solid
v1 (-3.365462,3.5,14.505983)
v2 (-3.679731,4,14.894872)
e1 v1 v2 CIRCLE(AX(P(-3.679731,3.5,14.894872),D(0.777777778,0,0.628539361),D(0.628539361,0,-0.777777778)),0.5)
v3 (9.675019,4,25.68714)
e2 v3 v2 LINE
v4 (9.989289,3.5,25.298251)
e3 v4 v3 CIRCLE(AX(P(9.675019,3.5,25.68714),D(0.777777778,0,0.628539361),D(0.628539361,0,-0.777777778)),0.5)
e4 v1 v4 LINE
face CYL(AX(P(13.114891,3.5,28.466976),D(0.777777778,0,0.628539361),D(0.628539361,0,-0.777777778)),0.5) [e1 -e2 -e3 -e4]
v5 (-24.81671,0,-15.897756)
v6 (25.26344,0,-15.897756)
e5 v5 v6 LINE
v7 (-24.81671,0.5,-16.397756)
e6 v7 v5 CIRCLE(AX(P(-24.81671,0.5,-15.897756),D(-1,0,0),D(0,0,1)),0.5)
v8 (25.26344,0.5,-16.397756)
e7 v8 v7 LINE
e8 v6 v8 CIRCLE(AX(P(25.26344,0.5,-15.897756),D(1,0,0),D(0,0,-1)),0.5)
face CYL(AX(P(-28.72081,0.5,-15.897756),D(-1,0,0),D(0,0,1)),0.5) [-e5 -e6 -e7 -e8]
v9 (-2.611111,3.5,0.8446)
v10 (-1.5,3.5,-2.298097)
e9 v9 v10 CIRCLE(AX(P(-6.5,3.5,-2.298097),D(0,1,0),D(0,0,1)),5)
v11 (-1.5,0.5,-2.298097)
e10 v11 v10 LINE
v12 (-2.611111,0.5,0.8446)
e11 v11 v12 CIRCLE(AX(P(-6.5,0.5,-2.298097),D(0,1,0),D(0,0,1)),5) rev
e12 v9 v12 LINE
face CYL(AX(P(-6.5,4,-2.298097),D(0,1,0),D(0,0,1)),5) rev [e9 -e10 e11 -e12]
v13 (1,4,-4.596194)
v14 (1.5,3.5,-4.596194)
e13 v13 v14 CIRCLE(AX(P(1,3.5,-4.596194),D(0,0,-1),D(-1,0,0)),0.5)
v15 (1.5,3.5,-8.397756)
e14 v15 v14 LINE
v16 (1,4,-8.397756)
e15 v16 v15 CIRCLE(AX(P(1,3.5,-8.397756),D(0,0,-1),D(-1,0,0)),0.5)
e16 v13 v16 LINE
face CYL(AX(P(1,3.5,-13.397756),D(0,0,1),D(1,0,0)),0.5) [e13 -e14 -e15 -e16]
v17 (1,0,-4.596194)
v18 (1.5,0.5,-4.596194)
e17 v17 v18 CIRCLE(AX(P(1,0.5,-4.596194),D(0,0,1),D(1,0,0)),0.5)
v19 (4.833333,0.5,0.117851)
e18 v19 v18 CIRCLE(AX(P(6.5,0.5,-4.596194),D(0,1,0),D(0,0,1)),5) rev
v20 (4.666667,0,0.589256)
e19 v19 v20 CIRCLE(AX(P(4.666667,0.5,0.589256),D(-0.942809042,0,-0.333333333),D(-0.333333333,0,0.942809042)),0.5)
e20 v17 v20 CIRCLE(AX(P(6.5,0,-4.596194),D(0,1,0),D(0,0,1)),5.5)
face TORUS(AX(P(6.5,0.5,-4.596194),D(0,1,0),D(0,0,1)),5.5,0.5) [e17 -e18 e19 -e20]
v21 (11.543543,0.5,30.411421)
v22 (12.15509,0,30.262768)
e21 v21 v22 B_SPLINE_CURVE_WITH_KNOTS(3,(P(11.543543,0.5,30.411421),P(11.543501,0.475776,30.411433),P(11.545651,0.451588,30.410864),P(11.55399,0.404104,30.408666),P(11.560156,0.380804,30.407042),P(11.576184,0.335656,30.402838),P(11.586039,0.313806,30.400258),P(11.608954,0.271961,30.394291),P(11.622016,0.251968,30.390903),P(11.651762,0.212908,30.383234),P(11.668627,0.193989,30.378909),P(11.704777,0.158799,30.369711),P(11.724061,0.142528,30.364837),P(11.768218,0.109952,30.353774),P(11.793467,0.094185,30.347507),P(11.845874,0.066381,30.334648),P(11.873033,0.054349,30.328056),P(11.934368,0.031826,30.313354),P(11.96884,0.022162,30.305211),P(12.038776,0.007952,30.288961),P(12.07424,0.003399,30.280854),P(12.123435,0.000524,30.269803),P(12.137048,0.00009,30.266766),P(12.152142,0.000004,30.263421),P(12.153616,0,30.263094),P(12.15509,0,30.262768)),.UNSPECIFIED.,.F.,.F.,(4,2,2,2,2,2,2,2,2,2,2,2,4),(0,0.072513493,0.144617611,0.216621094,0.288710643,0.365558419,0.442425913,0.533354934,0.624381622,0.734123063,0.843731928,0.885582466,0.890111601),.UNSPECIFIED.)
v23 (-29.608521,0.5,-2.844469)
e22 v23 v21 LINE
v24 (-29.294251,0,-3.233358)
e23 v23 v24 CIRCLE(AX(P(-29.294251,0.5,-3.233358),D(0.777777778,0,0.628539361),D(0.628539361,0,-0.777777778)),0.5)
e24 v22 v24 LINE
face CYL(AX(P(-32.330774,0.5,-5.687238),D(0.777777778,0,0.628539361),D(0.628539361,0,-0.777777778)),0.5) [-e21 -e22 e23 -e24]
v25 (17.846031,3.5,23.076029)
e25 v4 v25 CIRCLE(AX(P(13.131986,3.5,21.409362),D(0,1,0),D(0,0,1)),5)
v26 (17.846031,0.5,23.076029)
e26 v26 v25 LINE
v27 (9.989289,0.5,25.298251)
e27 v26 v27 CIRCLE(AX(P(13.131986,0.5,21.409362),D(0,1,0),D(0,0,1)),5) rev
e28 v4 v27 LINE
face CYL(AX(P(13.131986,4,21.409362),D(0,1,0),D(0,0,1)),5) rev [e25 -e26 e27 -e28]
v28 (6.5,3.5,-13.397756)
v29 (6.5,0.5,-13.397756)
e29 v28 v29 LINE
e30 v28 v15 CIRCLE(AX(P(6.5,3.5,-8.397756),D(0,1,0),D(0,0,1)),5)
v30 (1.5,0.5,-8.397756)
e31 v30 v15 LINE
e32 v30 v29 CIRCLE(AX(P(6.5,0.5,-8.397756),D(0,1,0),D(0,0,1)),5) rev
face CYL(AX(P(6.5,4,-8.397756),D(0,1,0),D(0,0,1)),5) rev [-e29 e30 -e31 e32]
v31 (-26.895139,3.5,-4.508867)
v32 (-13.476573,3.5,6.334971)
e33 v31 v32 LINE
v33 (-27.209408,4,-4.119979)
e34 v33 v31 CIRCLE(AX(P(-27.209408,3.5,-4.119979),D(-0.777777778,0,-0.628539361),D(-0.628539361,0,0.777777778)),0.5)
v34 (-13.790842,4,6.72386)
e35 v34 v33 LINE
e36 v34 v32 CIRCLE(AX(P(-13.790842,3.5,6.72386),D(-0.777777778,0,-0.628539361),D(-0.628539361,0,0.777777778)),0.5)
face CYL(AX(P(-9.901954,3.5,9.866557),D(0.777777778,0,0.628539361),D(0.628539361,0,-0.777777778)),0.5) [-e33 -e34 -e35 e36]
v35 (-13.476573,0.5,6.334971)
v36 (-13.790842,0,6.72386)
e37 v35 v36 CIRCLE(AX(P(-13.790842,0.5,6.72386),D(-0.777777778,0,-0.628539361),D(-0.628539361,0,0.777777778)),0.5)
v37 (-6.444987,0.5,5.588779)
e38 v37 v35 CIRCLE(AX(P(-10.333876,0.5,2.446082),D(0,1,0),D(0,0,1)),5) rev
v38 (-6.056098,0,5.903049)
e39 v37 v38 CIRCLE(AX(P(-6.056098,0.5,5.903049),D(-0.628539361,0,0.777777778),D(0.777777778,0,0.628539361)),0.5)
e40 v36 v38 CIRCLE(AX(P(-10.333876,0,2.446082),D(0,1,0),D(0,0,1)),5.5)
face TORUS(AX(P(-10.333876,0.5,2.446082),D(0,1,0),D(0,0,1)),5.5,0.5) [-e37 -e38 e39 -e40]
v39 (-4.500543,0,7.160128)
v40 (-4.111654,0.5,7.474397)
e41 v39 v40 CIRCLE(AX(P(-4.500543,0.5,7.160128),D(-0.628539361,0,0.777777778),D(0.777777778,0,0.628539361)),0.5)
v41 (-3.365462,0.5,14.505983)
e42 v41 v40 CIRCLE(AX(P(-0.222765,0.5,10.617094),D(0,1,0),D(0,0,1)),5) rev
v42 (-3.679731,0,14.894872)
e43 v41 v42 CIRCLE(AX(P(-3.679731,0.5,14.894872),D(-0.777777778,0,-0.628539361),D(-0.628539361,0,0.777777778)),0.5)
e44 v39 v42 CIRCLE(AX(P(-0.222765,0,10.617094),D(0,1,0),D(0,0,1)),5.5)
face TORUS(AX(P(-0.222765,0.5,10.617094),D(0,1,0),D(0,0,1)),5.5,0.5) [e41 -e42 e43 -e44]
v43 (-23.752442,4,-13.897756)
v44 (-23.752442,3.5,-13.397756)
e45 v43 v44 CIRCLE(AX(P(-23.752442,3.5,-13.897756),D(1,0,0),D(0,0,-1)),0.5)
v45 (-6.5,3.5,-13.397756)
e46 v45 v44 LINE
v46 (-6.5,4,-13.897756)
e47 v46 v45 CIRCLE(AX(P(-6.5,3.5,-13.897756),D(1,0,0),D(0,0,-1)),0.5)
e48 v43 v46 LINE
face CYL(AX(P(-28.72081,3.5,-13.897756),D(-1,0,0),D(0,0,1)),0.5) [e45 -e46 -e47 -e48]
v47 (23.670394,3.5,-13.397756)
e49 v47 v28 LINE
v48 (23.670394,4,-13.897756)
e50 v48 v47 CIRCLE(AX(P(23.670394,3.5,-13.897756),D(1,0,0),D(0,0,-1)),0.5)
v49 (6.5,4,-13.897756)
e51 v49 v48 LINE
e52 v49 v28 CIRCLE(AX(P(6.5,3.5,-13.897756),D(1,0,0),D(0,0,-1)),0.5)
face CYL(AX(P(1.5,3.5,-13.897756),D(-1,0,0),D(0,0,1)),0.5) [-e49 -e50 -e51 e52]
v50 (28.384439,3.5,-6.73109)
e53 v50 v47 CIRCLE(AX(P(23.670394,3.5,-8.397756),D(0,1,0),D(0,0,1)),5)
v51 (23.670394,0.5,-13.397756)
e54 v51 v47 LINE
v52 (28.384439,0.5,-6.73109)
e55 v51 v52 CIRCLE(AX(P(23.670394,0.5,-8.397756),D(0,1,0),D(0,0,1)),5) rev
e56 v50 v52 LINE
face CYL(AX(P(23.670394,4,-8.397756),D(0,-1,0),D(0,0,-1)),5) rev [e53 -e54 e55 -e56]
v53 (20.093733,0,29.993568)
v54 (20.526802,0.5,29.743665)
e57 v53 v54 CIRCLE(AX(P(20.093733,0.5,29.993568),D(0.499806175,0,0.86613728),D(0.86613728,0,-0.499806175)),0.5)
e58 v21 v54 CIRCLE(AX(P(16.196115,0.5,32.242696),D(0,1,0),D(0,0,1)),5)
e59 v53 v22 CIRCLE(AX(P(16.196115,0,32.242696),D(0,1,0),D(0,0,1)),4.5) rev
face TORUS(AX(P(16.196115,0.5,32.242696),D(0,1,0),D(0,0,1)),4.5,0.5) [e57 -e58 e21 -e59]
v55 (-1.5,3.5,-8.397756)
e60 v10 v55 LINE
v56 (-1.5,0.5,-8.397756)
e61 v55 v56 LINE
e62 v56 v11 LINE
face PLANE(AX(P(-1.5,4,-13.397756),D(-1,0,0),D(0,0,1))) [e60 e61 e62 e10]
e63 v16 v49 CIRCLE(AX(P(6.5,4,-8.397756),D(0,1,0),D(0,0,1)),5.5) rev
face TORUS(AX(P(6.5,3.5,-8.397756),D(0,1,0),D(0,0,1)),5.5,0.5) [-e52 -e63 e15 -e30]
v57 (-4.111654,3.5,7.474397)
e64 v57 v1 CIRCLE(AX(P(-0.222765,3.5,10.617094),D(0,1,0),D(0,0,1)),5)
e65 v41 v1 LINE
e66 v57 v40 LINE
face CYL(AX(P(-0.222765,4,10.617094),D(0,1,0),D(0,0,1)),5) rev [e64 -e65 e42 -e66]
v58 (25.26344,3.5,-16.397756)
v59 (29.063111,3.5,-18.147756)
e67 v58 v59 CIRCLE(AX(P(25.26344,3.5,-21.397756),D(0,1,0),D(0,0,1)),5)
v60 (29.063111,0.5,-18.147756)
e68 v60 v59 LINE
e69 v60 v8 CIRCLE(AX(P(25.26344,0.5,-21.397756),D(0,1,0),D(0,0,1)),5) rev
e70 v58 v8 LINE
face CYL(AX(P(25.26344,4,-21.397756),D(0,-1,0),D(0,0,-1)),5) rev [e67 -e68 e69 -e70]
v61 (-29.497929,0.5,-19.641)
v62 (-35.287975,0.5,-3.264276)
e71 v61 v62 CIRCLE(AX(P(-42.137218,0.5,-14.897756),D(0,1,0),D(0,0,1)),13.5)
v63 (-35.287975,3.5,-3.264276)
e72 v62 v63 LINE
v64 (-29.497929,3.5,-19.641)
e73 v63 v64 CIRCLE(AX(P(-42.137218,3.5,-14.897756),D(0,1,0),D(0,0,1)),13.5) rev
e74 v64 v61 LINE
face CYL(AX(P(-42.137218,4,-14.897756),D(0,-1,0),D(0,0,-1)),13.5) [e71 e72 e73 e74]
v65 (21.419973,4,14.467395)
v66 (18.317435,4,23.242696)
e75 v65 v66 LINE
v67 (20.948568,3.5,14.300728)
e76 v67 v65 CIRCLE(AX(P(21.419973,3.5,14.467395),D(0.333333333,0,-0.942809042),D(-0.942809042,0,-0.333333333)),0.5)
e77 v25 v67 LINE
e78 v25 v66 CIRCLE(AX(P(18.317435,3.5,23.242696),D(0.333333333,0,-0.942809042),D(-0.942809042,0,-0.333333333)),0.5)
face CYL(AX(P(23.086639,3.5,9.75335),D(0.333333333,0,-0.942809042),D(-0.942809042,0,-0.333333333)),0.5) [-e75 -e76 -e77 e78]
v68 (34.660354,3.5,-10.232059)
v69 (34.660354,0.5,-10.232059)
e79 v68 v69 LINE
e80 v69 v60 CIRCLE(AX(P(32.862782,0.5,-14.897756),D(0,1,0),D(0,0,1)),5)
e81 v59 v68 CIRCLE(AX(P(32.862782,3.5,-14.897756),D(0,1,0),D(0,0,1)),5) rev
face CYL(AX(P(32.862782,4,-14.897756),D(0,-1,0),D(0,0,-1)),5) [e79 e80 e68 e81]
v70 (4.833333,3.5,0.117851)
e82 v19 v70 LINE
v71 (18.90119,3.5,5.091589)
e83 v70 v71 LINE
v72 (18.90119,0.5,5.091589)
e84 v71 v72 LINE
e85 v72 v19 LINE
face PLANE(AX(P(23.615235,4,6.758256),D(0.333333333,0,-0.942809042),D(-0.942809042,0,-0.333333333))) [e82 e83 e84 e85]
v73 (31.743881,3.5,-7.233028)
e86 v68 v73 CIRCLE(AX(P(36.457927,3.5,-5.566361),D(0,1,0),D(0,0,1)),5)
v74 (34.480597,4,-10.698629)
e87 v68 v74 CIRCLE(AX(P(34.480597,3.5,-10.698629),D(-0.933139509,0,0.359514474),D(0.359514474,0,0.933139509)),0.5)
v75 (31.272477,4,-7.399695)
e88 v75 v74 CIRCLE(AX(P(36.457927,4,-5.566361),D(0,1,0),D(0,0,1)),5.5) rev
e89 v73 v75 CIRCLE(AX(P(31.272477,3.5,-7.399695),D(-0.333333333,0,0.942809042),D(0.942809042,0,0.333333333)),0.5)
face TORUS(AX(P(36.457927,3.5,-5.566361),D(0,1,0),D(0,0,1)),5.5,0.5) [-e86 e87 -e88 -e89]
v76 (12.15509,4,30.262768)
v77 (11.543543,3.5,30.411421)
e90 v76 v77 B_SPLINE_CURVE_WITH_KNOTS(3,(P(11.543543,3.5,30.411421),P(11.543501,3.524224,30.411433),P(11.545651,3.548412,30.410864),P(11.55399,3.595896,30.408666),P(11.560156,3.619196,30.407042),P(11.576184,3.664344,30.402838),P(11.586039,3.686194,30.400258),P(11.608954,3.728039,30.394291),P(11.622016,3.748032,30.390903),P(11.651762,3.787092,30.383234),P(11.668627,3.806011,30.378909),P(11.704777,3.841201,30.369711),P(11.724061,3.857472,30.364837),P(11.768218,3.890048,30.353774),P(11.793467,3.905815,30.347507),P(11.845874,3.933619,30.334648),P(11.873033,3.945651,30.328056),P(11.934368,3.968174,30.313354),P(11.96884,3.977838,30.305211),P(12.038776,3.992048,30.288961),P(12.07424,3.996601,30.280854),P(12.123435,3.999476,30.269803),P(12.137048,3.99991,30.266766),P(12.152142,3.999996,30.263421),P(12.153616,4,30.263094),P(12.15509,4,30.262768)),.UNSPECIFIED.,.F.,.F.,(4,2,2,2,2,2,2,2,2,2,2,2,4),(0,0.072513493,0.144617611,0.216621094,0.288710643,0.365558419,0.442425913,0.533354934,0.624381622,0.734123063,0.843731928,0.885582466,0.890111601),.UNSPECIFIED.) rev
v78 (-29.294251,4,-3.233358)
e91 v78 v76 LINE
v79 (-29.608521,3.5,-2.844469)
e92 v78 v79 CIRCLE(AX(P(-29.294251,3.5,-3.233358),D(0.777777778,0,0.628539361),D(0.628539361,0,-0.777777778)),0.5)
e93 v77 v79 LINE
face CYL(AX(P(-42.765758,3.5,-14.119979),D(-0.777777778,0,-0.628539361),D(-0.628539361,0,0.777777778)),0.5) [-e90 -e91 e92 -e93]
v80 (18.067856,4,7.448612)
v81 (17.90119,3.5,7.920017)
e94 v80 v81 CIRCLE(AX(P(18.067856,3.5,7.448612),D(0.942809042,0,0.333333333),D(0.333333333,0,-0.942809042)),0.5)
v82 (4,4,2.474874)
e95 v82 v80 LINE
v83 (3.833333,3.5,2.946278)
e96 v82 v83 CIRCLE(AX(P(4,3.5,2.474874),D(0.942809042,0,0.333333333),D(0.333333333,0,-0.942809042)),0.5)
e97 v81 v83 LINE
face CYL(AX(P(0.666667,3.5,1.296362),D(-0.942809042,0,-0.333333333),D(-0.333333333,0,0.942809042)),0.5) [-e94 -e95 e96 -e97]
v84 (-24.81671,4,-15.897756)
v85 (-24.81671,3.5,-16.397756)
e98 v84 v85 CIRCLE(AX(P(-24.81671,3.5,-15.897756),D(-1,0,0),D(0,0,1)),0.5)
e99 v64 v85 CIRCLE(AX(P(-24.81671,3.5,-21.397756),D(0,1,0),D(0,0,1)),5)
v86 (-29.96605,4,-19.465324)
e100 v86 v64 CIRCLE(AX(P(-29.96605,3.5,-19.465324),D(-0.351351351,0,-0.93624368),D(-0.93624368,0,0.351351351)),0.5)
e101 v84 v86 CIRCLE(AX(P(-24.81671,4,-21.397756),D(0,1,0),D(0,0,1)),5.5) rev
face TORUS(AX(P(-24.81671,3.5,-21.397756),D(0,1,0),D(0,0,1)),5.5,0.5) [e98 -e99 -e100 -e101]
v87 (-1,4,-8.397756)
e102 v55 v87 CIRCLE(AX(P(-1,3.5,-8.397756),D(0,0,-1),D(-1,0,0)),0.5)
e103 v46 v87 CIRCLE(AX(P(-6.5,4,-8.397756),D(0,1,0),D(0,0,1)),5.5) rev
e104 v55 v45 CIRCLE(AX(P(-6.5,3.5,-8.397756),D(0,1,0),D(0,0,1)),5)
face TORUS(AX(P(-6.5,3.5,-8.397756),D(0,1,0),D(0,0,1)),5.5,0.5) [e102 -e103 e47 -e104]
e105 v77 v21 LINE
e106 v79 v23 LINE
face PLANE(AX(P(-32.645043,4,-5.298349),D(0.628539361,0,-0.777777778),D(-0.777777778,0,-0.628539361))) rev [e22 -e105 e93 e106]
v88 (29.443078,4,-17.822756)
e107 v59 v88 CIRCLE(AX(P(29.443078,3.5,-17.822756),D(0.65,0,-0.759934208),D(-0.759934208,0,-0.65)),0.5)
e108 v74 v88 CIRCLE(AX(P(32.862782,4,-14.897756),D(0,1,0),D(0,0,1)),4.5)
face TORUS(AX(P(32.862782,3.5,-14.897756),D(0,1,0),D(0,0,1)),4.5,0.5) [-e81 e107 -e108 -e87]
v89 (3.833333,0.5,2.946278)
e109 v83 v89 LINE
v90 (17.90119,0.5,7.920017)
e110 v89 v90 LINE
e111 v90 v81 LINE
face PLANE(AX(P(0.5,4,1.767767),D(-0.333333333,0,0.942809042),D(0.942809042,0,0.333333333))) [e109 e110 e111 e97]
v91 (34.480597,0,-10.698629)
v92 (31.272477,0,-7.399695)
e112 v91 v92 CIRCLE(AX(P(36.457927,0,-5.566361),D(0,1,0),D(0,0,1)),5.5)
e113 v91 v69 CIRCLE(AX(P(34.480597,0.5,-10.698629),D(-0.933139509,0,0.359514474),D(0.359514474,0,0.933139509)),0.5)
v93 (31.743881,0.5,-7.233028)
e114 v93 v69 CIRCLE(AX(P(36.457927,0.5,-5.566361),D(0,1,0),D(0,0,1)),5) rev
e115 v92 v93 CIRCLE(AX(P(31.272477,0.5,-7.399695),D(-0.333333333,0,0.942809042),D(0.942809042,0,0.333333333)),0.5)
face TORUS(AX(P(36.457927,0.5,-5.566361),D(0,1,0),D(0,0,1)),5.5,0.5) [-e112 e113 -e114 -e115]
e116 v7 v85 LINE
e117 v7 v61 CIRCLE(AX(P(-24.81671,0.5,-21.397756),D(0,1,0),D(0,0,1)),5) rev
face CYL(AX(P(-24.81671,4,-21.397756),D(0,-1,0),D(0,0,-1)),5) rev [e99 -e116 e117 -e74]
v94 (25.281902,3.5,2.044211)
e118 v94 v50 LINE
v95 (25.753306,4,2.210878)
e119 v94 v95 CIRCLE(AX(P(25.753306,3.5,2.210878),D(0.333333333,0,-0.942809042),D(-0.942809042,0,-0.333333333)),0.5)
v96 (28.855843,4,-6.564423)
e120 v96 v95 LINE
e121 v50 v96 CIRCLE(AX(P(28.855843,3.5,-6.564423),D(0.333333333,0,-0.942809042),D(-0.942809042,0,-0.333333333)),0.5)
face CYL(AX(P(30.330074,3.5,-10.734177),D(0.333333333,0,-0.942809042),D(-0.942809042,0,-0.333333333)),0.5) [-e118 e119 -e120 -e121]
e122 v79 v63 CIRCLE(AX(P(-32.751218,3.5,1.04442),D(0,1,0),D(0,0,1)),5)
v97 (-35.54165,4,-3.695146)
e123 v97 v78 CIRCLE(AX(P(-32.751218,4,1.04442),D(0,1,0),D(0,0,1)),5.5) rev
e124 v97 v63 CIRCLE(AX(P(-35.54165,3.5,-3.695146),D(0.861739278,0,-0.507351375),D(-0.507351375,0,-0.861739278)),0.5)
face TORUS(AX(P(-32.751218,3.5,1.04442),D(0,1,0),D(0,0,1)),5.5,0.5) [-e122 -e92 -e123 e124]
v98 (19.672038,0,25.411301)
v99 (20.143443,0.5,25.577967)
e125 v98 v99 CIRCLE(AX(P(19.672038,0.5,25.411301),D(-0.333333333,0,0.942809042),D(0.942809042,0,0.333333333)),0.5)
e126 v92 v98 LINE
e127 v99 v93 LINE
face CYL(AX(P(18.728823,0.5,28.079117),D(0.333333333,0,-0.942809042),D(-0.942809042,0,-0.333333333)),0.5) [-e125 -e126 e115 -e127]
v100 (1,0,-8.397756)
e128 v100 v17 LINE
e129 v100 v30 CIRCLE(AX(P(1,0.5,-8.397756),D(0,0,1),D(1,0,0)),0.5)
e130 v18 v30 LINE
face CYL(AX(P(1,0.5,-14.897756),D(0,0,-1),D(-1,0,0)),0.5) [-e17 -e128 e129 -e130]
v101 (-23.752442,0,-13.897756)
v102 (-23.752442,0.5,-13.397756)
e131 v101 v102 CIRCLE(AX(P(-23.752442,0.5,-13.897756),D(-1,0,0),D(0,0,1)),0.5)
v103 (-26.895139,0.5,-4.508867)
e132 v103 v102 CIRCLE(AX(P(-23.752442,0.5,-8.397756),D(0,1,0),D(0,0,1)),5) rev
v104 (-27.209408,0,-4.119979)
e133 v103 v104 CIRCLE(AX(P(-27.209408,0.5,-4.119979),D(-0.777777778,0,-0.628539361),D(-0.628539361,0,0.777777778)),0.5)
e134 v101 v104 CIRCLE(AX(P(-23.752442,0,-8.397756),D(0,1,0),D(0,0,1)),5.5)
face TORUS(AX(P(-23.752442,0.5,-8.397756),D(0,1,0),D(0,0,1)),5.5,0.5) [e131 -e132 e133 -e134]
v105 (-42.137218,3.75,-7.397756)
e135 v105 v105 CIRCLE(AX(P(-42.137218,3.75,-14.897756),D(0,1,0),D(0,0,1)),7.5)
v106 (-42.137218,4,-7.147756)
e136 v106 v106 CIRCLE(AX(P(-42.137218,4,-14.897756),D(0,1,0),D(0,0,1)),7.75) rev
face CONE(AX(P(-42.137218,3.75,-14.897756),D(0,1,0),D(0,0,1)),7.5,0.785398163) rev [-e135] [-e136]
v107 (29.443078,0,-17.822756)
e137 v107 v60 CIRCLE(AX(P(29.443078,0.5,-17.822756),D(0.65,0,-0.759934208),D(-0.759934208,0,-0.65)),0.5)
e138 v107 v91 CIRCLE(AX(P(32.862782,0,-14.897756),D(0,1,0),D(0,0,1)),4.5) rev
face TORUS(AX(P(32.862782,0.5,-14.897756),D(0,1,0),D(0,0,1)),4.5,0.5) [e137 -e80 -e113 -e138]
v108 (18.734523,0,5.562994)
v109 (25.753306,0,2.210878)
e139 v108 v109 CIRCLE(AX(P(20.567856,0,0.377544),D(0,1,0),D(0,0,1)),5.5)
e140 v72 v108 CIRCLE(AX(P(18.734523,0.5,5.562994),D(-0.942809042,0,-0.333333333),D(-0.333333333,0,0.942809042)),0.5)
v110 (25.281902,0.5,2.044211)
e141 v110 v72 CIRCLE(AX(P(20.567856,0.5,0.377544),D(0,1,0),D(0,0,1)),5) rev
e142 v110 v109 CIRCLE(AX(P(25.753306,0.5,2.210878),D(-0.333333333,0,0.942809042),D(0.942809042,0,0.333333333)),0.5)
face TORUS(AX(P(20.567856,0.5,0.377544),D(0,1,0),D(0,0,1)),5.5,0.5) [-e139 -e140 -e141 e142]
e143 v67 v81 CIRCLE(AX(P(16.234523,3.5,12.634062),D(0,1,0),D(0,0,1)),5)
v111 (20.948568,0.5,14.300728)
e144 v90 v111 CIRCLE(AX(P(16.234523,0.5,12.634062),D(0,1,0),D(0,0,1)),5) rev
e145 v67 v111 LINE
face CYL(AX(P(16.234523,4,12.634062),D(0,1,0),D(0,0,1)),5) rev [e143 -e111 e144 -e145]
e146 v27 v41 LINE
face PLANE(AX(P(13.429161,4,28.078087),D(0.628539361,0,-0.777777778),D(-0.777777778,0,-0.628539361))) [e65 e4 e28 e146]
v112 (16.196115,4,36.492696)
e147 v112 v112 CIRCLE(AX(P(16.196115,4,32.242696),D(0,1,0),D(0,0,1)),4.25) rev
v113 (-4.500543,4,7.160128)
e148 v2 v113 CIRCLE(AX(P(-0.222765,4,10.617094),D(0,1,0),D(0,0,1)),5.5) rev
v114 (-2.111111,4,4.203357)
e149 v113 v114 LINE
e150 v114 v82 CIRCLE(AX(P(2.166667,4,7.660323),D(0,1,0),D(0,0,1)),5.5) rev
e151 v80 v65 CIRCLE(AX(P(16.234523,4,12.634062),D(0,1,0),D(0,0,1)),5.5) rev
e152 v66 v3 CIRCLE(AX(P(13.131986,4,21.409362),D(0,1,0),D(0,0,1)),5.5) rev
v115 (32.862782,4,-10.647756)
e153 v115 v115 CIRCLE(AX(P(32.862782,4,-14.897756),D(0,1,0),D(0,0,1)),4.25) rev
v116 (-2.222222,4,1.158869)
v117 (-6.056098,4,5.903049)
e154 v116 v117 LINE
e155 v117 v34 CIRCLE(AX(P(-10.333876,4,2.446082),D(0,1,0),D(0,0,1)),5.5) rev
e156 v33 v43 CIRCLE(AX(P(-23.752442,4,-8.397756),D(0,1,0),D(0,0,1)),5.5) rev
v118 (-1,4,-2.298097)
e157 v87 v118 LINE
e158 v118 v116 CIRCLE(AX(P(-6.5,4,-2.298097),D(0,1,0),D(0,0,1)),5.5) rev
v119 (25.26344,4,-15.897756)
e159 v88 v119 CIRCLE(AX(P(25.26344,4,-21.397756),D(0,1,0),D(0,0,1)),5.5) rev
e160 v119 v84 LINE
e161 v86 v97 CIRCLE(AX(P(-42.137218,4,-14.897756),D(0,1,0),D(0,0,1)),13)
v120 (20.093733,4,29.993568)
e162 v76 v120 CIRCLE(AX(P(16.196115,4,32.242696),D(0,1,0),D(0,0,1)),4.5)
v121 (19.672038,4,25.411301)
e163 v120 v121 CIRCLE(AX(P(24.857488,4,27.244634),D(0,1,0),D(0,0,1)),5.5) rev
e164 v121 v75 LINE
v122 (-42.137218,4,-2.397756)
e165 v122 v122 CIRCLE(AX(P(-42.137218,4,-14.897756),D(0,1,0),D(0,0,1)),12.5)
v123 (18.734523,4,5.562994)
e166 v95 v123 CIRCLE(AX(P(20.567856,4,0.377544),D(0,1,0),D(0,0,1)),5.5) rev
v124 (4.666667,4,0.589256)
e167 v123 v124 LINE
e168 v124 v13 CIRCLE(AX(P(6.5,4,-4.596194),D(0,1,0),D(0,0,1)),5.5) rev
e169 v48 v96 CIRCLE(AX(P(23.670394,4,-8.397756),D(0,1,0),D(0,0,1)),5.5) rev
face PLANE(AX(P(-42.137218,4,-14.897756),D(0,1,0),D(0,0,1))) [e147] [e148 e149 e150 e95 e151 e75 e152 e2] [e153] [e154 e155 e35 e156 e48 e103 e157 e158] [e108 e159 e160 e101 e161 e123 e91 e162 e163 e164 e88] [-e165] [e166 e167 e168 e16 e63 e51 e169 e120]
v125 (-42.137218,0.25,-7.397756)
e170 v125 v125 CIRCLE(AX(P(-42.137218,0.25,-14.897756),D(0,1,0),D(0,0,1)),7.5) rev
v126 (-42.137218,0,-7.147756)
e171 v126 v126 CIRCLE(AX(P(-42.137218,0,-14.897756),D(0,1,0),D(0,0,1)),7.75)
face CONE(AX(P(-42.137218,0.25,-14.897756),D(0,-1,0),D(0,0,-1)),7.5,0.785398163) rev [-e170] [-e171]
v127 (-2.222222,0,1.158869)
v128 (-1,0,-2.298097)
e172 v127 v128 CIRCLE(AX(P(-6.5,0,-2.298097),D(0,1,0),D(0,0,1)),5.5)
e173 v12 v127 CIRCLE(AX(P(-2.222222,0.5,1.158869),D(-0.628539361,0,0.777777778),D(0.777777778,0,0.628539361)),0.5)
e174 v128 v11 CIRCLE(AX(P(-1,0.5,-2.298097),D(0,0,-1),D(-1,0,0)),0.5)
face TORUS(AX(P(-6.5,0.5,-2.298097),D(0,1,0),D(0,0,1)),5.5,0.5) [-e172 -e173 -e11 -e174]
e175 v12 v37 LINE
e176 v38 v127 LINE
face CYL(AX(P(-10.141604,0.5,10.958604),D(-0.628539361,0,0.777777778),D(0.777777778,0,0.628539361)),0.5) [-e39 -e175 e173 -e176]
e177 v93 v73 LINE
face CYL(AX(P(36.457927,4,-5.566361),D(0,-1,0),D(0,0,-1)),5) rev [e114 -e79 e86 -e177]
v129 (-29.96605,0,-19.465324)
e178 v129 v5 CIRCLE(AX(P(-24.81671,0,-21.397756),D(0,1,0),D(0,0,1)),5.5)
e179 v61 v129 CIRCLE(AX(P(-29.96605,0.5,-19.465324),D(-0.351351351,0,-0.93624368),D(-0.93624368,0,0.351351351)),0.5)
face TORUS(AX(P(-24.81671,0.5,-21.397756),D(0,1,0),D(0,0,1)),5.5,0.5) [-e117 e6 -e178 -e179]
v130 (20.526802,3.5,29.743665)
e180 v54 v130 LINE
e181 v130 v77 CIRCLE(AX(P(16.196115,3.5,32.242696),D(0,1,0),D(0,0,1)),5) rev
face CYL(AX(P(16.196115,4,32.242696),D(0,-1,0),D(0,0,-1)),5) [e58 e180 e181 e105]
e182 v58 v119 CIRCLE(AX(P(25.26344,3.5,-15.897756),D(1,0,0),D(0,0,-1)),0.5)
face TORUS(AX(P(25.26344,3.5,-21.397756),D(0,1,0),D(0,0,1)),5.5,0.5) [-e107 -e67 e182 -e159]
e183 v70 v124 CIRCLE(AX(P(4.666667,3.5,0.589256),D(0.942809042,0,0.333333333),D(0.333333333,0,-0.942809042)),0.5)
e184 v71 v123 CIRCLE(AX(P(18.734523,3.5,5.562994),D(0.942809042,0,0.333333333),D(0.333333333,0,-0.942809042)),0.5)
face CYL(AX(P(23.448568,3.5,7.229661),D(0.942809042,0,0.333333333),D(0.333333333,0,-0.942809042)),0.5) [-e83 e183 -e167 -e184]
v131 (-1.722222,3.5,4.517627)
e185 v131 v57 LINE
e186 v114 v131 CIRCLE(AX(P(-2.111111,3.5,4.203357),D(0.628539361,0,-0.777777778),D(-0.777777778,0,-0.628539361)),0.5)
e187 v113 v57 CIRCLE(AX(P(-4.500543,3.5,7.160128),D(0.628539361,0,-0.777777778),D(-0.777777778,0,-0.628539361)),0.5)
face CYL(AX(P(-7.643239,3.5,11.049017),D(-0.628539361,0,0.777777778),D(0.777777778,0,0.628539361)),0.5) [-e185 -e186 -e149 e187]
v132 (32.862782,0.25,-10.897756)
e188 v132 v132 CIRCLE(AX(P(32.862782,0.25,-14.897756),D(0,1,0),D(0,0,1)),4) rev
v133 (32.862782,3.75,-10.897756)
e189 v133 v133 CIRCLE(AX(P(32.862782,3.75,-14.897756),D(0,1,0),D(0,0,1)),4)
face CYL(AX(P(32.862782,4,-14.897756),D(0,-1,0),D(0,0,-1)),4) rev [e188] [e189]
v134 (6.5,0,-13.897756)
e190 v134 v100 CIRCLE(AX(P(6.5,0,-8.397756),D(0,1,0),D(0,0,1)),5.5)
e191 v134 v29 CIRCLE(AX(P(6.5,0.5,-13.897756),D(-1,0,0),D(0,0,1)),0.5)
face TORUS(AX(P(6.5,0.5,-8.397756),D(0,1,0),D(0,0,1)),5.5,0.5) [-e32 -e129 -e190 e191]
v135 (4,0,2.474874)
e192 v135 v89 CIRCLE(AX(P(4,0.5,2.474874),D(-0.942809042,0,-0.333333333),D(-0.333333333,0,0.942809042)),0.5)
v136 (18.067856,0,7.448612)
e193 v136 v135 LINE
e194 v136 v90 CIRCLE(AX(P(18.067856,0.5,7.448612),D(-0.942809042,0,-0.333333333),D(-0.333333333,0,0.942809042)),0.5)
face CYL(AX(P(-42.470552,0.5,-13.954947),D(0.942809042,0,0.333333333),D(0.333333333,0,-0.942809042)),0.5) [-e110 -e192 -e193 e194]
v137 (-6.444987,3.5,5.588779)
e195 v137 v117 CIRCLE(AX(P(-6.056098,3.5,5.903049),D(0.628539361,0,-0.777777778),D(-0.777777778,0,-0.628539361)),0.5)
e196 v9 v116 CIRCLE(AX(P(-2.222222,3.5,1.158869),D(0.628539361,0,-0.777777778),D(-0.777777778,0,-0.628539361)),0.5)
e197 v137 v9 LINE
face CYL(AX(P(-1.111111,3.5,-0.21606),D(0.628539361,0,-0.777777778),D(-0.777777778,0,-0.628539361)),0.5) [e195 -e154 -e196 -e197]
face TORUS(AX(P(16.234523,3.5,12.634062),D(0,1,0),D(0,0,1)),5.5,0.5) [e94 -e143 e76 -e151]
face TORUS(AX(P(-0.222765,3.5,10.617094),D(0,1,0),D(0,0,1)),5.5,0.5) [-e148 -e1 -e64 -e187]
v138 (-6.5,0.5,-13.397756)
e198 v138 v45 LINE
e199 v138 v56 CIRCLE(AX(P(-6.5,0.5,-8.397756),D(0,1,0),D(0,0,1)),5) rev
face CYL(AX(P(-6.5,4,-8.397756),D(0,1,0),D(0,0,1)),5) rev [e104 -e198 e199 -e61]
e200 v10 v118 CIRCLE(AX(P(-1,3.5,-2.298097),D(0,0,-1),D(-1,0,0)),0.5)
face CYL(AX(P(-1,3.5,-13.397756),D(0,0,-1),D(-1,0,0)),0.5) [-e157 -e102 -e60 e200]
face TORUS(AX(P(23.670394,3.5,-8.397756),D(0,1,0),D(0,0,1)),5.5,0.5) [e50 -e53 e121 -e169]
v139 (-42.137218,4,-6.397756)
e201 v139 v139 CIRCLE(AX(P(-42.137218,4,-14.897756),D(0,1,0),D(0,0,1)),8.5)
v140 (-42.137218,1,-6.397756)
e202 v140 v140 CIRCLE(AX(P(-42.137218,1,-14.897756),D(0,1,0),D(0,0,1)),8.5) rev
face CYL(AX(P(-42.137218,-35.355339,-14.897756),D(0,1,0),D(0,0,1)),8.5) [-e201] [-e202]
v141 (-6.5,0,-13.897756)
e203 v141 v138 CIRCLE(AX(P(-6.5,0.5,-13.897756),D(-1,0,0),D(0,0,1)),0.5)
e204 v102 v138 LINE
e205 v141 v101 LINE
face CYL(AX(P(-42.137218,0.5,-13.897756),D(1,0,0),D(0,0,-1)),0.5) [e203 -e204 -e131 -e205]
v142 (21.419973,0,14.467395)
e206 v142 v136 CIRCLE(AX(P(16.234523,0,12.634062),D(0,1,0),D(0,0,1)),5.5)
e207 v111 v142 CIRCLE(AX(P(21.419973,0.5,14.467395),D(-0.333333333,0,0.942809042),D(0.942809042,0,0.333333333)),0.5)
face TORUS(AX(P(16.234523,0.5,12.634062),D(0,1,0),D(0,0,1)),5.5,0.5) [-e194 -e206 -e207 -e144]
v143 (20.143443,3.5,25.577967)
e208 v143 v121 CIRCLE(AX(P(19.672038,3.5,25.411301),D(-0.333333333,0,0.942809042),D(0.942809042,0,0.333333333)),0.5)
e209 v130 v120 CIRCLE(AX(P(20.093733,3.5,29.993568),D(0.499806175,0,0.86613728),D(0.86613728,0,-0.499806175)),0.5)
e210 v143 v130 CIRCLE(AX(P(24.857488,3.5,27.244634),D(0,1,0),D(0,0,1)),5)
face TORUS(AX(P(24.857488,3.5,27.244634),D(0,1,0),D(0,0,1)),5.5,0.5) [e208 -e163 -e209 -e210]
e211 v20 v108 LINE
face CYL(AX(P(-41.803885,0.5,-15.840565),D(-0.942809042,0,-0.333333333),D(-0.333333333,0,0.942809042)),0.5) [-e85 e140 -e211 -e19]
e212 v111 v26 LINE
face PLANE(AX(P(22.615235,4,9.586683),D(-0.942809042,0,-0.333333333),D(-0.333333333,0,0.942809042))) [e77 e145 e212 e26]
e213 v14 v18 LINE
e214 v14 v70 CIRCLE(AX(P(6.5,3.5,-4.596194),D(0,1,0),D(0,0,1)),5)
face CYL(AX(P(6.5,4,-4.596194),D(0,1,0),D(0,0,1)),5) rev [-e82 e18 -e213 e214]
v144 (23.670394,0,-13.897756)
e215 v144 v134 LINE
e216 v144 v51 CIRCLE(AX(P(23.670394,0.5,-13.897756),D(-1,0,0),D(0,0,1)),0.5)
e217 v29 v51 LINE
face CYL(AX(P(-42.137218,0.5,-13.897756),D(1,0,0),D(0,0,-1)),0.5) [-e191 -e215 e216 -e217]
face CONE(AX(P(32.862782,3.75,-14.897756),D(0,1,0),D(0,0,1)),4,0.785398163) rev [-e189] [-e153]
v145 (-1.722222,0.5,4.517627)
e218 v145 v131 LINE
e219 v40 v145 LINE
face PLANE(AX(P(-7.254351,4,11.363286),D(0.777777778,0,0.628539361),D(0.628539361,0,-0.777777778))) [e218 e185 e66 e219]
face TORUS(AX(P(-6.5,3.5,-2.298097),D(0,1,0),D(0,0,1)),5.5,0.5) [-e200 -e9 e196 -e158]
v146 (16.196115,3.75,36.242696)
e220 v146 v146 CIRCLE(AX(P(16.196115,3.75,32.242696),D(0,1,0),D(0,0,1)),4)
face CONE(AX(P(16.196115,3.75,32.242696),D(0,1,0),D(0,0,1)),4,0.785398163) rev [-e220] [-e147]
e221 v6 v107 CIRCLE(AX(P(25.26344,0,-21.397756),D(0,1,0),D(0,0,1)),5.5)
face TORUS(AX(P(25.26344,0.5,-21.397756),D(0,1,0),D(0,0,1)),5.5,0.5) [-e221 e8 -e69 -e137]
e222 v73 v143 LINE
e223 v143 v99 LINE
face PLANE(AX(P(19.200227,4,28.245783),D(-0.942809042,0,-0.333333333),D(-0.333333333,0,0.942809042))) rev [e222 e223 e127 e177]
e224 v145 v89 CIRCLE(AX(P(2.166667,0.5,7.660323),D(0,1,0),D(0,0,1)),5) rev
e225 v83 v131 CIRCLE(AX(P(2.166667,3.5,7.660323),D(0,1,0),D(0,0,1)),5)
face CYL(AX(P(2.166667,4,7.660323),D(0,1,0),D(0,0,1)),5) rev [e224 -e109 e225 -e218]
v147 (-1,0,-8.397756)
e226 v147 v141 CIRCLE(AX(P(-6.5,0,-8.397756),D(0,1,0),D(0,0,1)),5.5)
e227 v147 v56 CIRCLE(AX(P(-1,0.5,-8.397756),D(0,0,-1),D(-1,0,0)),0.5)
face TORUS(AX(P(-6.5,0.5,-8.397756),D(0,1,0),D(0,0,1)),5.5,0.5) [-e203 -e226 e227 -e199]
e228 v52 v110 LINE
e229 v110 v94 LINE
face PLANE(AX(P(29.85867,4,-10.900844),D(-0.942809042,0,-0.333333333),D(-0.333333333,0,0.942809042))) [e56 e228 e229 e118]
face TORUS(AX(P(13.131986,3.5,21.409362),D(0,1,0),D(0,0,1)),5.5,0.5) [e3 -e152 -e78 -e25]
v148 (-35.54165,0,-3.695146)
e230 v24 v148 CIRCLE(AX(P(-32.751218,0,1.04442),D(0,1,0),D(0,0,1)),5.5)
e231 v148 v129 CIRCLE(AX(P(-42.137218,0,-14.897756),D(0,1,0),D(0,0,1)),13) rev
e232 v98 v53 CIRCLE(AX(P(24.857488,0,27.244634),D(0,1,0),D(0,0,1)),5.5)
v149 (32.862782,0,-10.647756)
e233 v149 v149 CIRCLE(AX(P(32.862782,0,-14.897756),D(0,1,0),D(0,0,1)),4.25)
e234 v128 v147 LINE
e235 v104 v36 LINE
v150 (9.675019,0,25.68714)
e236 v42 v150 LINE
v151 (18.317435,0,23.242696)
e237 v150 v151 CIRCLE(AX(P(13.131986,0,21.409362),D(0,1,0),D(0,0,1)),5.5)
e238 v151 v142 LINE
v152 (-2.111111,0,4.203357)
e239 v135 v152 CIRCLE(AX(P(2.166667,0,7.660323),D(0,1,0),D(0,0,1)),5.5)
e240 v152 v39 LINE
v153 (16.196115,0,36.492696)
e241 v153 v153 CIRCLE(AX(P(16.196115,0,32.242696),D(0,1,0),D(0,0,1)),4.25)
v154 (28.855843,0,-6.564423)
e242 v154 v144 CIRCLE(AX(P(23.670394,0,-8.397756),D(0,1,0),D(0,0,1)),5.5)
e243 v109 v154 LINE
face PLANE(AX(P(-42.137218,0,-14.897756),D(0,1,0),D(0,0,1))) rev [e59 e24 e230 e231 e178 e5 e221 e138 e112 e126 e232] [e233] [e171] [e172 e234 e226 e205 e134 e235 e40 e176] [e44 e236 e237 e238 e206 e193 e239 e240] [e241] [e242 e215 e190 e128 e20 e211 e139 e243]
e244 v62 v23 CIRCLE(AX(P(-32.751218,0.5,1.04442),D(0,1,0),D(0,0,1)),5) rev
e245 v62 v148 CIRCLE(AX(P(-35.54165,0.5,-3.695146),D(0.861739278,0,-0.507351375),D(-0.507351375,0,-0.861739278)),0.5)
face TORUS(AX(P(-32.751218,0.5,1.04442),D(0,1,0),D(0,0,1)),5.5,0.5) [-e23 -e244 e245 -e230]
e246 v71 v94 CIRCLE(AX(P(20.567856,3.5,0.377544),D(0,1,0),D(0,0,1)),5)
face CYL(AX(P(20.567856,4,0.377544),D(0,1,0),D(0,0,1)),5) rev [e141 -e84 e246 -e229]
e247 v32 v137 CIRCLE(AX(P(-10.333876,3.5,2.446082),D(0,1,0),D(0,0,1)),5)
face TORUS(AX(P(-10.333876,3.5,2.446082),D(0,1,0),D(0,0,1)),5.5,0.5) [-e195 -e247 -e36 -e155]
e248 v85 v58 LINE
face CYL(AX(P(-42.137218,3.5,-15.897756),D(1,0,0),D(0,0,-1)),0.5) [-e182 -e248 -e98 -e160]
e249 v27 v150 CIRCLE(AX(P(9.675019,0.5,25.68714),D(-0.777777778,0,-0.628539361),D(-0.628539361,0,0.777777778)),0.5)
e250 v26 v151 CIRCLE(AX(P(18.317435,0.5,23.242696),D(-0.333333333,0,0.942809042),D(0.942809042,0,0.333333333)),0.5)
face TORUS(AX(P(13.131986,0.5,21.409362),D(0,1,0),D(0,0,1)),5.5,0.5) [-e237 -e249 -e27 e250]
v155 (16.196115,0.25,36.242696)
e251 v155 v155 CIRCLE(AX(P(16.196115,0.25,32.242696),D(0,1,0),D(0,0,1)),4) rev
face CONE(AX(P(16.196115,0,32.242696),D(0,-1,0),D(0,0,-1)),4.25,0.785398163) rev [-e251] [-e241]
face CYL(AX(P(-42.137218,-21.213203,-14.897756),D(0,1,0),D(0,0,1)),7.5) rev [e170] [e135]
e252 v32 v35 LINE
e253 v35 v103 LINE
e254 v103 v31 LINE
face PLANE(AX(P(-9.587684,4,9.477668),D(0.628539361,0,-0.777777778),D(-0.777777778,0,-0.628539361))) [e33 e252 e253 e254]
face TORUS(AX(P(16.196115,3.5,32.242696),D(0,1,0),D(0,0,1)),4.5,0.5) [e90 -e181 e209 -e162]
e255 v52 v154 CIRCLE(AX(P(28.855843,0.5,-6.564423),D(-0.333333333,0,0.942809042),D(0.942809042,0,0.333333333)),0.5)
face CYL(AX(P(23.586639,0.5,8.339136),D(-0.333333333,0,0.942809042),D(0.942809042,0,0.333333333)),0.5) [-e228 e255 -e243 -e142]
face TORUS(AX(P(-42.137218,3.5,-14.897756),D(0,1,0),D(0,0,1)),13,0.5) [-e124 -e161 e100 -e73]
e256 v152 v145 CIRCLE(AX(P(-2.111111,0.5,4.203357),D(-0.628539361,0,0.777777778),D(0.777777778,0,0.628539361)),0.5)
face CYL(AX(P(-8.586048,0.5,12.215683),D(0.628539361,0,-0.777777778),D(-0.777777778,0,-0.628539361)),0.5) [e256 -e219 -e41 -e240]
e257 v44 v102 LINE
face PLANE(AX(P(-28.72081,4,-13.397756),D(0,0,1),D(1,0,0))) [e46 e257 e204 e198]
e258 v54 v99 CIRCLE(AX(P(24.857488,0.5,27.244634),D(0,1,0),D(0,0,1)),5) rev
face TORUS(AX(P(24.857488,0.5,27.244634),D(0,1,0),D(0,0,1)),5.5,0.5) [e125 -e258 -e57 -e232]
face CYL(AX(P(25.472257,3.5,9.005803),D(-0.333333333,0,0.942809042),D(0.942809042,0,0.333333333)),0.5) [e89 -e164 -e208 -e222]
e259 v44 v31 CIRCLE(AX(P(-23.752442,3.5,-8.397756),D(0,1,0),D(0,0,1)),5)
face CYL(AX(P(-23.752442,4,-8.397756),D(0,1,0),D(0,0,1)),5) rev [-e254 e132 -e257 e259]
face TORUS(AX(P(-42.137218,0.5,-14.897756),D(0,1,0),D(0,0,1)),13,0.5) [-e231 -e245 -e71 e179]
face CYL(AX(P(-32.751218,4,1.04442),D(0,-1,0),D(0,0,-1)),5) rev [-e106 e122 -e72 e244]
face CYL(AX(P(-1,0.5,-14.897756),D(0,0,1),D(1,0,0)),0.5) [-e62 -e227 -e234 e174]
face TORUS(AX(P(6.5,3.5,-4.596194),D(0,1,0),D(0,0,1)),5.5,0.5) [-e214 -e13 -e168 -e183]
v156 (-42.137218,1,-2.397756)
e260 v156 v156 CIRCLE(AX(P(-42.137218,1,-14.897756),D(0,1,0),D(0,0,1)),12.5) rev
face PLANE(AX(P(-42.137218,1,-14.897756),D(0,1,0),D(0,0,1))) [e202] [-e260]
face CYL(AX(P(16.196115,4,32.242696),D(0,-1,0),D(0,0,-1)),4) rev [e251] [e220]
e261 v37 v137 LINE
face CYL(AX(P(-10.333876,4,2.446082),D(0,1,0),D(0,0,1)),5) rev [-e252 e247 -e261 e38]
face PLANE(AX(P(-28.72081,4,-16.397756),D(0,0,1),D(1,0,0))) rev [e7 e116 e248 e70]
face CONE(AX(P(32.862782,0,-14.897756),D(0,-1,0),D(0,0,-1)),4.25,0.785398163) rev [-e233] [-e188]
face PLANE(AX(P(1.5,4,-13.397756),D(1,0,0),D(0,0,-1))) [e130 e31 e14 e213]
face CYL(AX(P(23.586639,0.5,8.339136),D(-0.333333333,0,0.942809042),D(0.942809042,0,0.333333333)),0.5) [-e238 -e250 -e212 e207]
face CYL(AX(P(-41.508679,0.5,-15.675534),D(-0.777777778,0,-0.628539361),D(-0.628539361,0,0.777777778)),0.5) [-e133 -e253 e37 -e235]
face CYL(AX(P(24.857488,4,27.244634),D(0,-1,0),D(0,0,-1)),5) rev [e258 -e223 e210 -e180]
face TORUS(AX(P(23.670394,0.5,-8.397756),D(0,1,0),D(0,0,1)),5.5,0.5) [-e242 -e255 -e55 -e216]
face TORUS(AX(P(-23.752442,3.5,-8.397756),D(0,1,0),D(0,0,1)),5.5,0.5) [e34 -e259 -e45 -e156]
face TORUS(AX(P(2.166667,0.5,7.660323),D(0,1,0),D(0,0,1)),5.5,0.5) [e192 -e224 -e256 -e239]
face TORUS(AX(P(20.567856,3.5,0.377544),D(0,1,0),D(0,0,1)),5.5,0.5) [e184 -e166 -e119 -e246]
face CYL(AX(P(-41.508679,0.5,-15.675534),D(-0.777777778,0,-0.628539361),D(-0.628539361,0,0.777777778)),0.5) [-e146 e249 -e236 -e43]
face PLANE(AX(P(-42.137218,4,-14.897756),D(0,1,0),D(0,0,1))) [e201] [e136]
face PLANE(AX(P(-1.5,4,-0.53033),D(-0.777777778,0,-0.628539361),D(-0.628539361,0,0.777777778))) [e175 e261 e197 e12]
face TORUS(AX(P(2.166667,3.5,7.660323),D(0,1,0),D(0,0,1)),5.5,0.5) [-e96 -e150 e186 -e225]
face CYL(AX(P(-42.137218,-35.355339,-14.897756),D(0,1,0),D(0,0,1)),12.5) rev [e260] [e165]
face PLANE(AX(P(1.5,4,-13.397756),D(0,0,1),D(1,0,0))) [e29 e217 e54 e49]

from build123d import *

# Parameters (mm, degrees)
ESQUISSE1_R             = 4
BOSS_EXTRU_1_DEPTH      = 4
ESQUISSE2_R             = 12.5
ESQUISSE2_R_2           = 8.5
ENL_V_MAT_EXTRU_1_DEPTH = 3
ESQUISSE3_R             = 7.5
ENL_V_MAT_EXTRU_2_DEPTH = 4
CONG_1_R                = 5
CONG_2_R                = 5
CONG_3_R                = 0.5
CHANFREIN1_SIZE         = 0.25


with BuildPart() as part:
    # Esquisse1 → Boss.-Extru.1 (new body)
    with BuildSketch(Plane(origin=(0, 0, 0), x_dir=(1, 0, 0), z_dir=(0, 1, 0))):
        with BuildLine():
            Line((-28.720810356, 16.397756372), (28.093085772, 16.397756372))
            ThreePointArc((28.093085772, 16.397756372), (36.945264684, 17.784507718), (32.687096673, 9.900843851))
            Line((32.687096673, 9.900843851), (19.200227344, -28.245783186))
            ThreePointArc((19.200227344, -28.245783186), (17.556942748, -37.05394795), (11.54354251, -30.411420693))
            Line((11.54354251, -30.411420693), (-32.645043367, 5.298349278))
            ThreePointArc((-32.645043367, 5.298349278), (-54.865140282, 19.397756372), (-28.720810356, 16.397756372))
        make_face()
        with Locations(Location((32.862781779, 14.897756372, 0), (0, 0, 270))):
            Circle(ESQUISSE1_R, mode=Mode.SUBTRACT)
        with Locations(Location((16.196115113, -32.242695707, 0), (0, 0, 270))):
            Circle(ESQUISSE1_R, mode=Mode.SUBTRACT)
        with BuildLine():
            Line((-28.720810356, 13.397756372), (-1.5, 13.397756372))
            Line((-1.5, 13.397756372), (-1.5, 0.530330086))
            Line((-1.5, 0.530330086), (-9.587683896, -9.477668137))
            Line((-9.587683896, -9.477668137), (-30.759425284, 7.631682612))
            ThreePointArc((-30.759425284, 7.631682612), (-29.409296159, 10.397756372), (-28.720810356, 13.397756372))
        make_face(mode=Mode.SUBTRACT)
        with BuildLine():
            Line((29.858669548, 10.900843851), (23.615234884, -6.758256105))
            Line((23.615234884, -6.758256105), (1.5, 1.060660172))
            Line((1.5, 1.060660172), (1.5, 13.397756372))
            Line((1.5, 13.397756372), (28.093085772, 13.397756372))
            ThreePointArc((28.093085772, 13.397756372), (28.780298875, 12.011005026), (29.858669548, 10.900843851))
        make_face(mode=Mode.SUBTRACT)
        with BuildLine():
            Line((13.429160593, -28.07808736), (-7.254350563, -11.36328622))
            Line((-7.254350563, -11.36328622), (0.5, -1.767766953))
            Line((0.5, -1.767766953), (22.615234884, -9.58668323))
            Line((22.615234884, -9.58668323), (16.371800219, -27.245783186))
            ThreePointArc((16.371800219, -27.245783186), (14.835287478, -27.431443464), (13.429160593, -28.07808736))
        make_face(mode=Mode.SUBTRACT)
    extrude(amount=BOSS_EXTRU_1_DEPTH)

    # Esquisse2 → Enlèv. mat.-Extru.1 (cut)
    with BuildSketch(Plane(origin=(0, 4, 0), x_dir=(1, 0, 0), z_dir=(0, 1, 0))):
        with Locations(Location((-42.137218221, 14.897756372, 0), (0, 0, 270))):
            Circle(ESQUISSE2_R)
        with Locations(Location((-42.137218221, 14.897756372, 0), (0, 0, 270))):
            Circle(ESQUISSE2_R_2, mode=Mode.SUBTRACT)
    extrude(amount=-ENL_V_MAT_EXTRU_1_DEPTH, mode=Mode.SUBTRACT)

    # Esquisse3 → Enlèv. mat.-Extru.2 (cut)
    with BuildSketch(Plane(origin=(0, 4, 0), x_dir=(1, 0, 0), z_dir=(0, 1, 0))):
        with Locations(Location((-42.137218221, 14.897756372, 0), (0, 0, 270))):
            Circle(ESQUISSE3_R)
    extrude(amount=-ENL_V_MAT_EXTRU_2_DEPTH, mode=Mode.SUBTRACT)

    # Congé1
    # the kernel refuses this fillet: 5 mm, written as the material it adds along each edge
    with BuildSketch(Plane(origin=(-28.720810356, 0, -16.397756372), x_dir=(-0.23301565344383435, 0, -0.9724729843292012), z_dir=(0, 1, 0))) as cong_1_piece_1:
        with BuildLine():
            CenterArc((3.95264846, -4.96171025), CONG_1_R, 97.095310942, 69.430007908)
            Line((-0.909716462, -3.796631983), (0, 0))
            ThreePointArc((0, 0), (1.667523569, -0.103382324), (3.335047138, 0))
        make_face()
    extrude(amount=4)
    with BuildSketch(Plane(origin=(28.093085772, 0, -16.397756372), x_dir=(-1, 0, 0), z_dir=(0, 1, 0))) as cong_1_piece_2:
        with BuildLine():
            CenterArc((2.82964607, -5), CONG_1_R, 90, 49.458398126)
            ThreePointArc((-0.970024969, -1.75), (-0.396580654, -0.924017762), (0, 0))
            Line((0, 0), (2.82964607, 0))
        make_face()
    extrude(amount=4)
    with BuildSketch(Plane(origin=(32.687096673, 0, -9.900843851), x_dir=(0.9862037230508544, 0, -0.16553614904495517), z_dir=(0, 1, 0)), Plane(origin=(28.093085772, 0, -13.397756372), x_dir=(0.4848035523785485, 0, 0.874623070585918), z_dir=(0, 1, 0)), Plane(origin=(16.371800219, 0, 27.245783186), x_dir=(-0.9862037230508537, 0, 0.1655361490449589), z_dir=(0, 1, 0))) as cong_1_piece_3:
        with BuildLine():
            CenterArc((3.001292886, -4.898891496), CONG_1_R, 101.541999375, 49.458398126)
            Line((-1.371822467, -2.474873734), (0, 0))
            ThreePointArc((0, 0), (1.000430962, -0.101108504), (2.000861924, 0))
        make_face()
    extrude(amount=4)
    with BuildSketch(Plane(origin=(19.200227344, 0, 28.245783186), x_dir=(0.6630013547984887, 0, 0.7486181961022377), z_dir=(0, 1, 0)), Plane(origin=(29.858669548, 0, -10.900843851), x_dir=(-0.6630013547984867, 0, -0.7486181961022396), z_dir=(0, 1, 0)), Plane(origin=(13.429160593, 0, 28.07808736), x_dir=(0.9268044555775469, 0, -0.3755442731844104), z_dir=(0, 1, 0))) as cong_1_piece_4:
        with BuildLine():
            CenterArc((3.001292886, 4.898891496), CONG_1_R, 208.999602499, 49.458398126)
            Line((-1.371822467, 2.474873734), (0, 0))
            ThreePointArc((0, 0), (1.000430962, 0.101108504), (2.000861924, 0))
        make_face()
    extrude(amount=4)
    with BuildSketch(Plane(origin=(-32.645043367, 0, -5.298349278), x_dir=(-0.7924719453362253, 0, 0.6099083667691554), z_dir=(0, 1, 0)), Plane(origin=(-28.720810356, 0, -13.397756372), x_dir=(-0.23301565344383335, 0, 0.9724729843292015), z_dir=(0, 1, 0))) as cong_1_piece_5:
        with BuildLine():
            CenterArc((3.95264846, 4.96171025), CONG_1_R, 193.47468115, 69.430007908)
            Line((-0.909716462, 3.796631983), (0, 0))
            ThreePointArc((0, 0), (1.667523569, 0.103382324), (3.335047138, 0))
        make_face()
    extrude(amount=4)
    with BuildSketch(Plane(origin=(-30.759425284, 0, -7.631682612), x_dir=(0.777777777777778, 0, 0.6285393610547088), z_dir=(0, 1, 0))) as cong_1_piece_6:
        with BuildLine():
            CenterArc((3.904100211, 5), CONG_1_R, 200.569992092, 69.430007908)
            ThreePointArc((-0.777118188, 3.243243243), (-0.288022577, 1.645711321), (0, 0))
            Line((0, 0), (3.904100211, 0))
        make_face()
    extrude(amount=4)
    with BuildSketch(Plane(origin=(-9.587683896, 0, 9.477668137), x_dir=(-0.7777777777777779, 0, -0.6285393610547088), z_dir=(0, 1, 0)), Plane(origin=(-1.5, 0, -13.397756372), x_dir=(0, 0, 1), z_dir=(0, 1, 0)), Plane(origin=(1.5, 0, -13.397756372), x_dir=(1, 0, 0), z_dir=(0, 1, 0)), Plane(origin=(22.615234884, 0, 9.58668323), x_dir=(-0.3333333333333328, 0, 0.9428090415820636), z_dir=(0, 1, 0))) as cong_1_piece_7:
        with BuildLine():
            CenterArc((CONG_1_R, -CONG_1_R), CONG_1_R, 90, 90)
            Line((0, -CONG_1_R), (0, 0))
            Line((0, 0), (CONG_1_R, 0))
        make_face()
    extrude(amount=4)
    with BuildSketch(Plane(origin=(-1.5, 0, -0.530330086), x_dir=(-0.6285393610547093, 0, 0.7777777777777775), z_dir=(0, 1, 0))) as cong_1_piece_8:
        with BuildLine():
            CenterArc((CONG_1_R * 0.353553390593, -CONG_1_R), CONG_1_R, 90, 38.942441269)
            Line((-CONG_1_R * 0.274985970461, -CONG_1_R * 0.222222222222), (0, 0))
            Line((0, 0), (CONG_1_R * 0.353553390593, 0))
        make_face()
    extrude(amount=4)
    with BuildSketch(Plane(origin=(1.5, 0, -1.060660172), x_dir=(0, 0, -1), z_dir=(0, 1, 0)), Plane(origin=(0.5, 0, 1.767766953), x_dir=(0.9428090415820635, 0, 0.3333333333333329), z_dir=(0, 1, 0))) as cong_1_piece_9:
        with BuildLine():
            CenterArc((CONG_1_R * 0.707106781187, -CONG_1_R), CONG_1_R, 90, 70.528779366)
            Line((-CONG_1_R * 0.235702260396, -CONG_1_R * 0.666666666667), (0, 0))
            Line((0, 0), (CONG_1_R * 0.707106781187, 0))
        make_face()
    extrude(amount=4)
    with BuildSketch(Plane(origin=(23.615234884, 0, 6.758256105), x_dir=(0.33333333333333354, 0, -0.9428090415820632), z_dir=(0, 1, 0)), Plane(origin=(-7.254350563, 0, 11.36328622), x_dir=(0.7777777777777775, 0, 0.6285393610547093), z_dir=(0, 1, 0))) as cong_1_piece_10:
        with BuildLine():
            CenterArc((CONG_1_R, CONG_1_R), CONG_1_R, 180, 90)
            Line((0, CONG_1_R), (0, 0))
            Line((0, 0), (CONG_1_R, 0))
        make_face()
    extrude(amount=4)

    # Congé2
    cong_2_edges = [part.edges().sort_by_distance(p)[0] for p in [
        (-29.400622927, 2, -10.394689922),
        (14.823602123, 2, 27.390129494),
        (28.745242809, 2, -11.986216644),
    ]]
    fillet(cong_2_edges, radius=CONG_2_R)

    # Congé3
    cong_3_edges = [part.edges().sort_by_distance(p)[0] for p in [
        (16.566759356, 4, 37.228939067),
        (-15.126220955, 0, -13.397756372),
        (-15.126220955, 4, -13.397756372),
        (36.945264684, 0, -17.784507718),
        (36.945264684, 4, -17.784507718),
        (25.943662008, 0, 9.172469668),
        (25.943662008, 4, 9.172469668),
        (10.867261505, 0, 5.433147409),
        (10.867261505, 4, 5.433147409),
        (-2.91693799, 0, 5.996011994),
        (-2.91693799, 4, 5.996011994),
        (3.311913624, 0, 19.902117144),
        (3.311913624, 4, 19.902117144),
        (26.833170191, 0, -2.343439404),
        (26.833170191, 4, -2.343439404),
        (11.867261505, 0, 2.604720284),
        (11.867261505, 4, 2.604720284),
        (1.5, 0, -6.496975225),
        (1.5, 4, -6.496975225),
        (-4.528049101, 0, 3.216689507),
        (-4.528049101, 4, 3.216689507),
        (-1.5, 0, -5.347926705),
        (-1.5, 4, -5.347926705),
        (-32.382638915, 0, -3.941976193),
        (-32.382638915, 4, -3.941976193),
        (-27.664184132, 0, -17.287781689),
        (-27.664184132, 4, -17.287781689),
        (27.355089769, 0, -16.856280841),
        (27.355089769, 4, -16.856280841),
        (32.87339902, 0, -9.052213057),
        (32.87339902, 4, -9.052213057),
        (19.878527027, 0, 27.702835371),
        (19.878527027, 4, 27.702835371),
        (0.805839032, 0, 2.84907122),
        (0.805839032, 4, 2.84907122),
        (-5.194846796, 0, 11.144731619),
        (-5.194846796, 4, 11.144731619),
        (20.746367644, 0, 10.47923974),
        (20.746367644, 4, 10.47923974),
        (22.722678374, 0, 4.889388866),
        (22.722678374, 4, 4.889388866),
        (2.964466094, 0, -11.933290278),
        (2.964466094, 4, -11.933290278),
        (2.417517095, 0, -1.709442732),
        (2.417517095, 4, -1.709442732),
        (-1.785954792, 0, -0.631430372),
        (-1.785954792, 4, -0.631430372),
        (-9.806238498, 0, 7.418164369),
        (-9.806238498, 4, 7.418164369),
        (-2.964466094, 0, -11.933290278),
        (-2.964466094, 4, -11.933290278),
        (19.397299576, 4, 18.688378739),
        (19.397299576, 0, 18.688378739),
        (15.085196812, 0, -13.397756372),
        (15.085196812, 4, -13.397756372),
        (-20.18585575, 0, 0.913051924),
        (-20.18585575, 4, 0.913051924),
        (14.492813363, 0, 26.220614617),
        (14.492813363, 4, 26.220614617),
        (27.752876529, 4, -11.284507718),
        (27.752876529, 0, -11.284507718),
        (-28.466487117, 0, -10.064423039),
        (-28.466487118, 4, -10.064423039),
        (16.566759356, 0, 37.228939067),
        (-9.032489235, 0, 13.783476033),
        (-9.032489235, 4, 13.783476033),
        (-54.865140282, 0, -19.397756372),
        (-54.865140282, 4, -19.397756372),
        (0.223364779, 0, -16.397756372),
        (0.223364779, 4, -16.397756372),
    ]]
    fillet(cong_3_edges, radius=CONG_3_R)

    # Chanfrein1
    chanfrein1_edges = [part.edges().sort_by_distance(p)[0] for p in [
        (32.862781779, 0, -18.897756372),
        (32.862781779, 4, -18.897756372),
        (16.196115113, 0, 28.242695707),
        (16.196115113, 4, 28.242695707),
        (-42.137218221, 4, -22.397756372),
        (-42.137218221, 0, -22.397756372),
    ]]
    chamfer(chanfrein1_edges, length=CHANFREIN1_SIZE)


solid = part.part
